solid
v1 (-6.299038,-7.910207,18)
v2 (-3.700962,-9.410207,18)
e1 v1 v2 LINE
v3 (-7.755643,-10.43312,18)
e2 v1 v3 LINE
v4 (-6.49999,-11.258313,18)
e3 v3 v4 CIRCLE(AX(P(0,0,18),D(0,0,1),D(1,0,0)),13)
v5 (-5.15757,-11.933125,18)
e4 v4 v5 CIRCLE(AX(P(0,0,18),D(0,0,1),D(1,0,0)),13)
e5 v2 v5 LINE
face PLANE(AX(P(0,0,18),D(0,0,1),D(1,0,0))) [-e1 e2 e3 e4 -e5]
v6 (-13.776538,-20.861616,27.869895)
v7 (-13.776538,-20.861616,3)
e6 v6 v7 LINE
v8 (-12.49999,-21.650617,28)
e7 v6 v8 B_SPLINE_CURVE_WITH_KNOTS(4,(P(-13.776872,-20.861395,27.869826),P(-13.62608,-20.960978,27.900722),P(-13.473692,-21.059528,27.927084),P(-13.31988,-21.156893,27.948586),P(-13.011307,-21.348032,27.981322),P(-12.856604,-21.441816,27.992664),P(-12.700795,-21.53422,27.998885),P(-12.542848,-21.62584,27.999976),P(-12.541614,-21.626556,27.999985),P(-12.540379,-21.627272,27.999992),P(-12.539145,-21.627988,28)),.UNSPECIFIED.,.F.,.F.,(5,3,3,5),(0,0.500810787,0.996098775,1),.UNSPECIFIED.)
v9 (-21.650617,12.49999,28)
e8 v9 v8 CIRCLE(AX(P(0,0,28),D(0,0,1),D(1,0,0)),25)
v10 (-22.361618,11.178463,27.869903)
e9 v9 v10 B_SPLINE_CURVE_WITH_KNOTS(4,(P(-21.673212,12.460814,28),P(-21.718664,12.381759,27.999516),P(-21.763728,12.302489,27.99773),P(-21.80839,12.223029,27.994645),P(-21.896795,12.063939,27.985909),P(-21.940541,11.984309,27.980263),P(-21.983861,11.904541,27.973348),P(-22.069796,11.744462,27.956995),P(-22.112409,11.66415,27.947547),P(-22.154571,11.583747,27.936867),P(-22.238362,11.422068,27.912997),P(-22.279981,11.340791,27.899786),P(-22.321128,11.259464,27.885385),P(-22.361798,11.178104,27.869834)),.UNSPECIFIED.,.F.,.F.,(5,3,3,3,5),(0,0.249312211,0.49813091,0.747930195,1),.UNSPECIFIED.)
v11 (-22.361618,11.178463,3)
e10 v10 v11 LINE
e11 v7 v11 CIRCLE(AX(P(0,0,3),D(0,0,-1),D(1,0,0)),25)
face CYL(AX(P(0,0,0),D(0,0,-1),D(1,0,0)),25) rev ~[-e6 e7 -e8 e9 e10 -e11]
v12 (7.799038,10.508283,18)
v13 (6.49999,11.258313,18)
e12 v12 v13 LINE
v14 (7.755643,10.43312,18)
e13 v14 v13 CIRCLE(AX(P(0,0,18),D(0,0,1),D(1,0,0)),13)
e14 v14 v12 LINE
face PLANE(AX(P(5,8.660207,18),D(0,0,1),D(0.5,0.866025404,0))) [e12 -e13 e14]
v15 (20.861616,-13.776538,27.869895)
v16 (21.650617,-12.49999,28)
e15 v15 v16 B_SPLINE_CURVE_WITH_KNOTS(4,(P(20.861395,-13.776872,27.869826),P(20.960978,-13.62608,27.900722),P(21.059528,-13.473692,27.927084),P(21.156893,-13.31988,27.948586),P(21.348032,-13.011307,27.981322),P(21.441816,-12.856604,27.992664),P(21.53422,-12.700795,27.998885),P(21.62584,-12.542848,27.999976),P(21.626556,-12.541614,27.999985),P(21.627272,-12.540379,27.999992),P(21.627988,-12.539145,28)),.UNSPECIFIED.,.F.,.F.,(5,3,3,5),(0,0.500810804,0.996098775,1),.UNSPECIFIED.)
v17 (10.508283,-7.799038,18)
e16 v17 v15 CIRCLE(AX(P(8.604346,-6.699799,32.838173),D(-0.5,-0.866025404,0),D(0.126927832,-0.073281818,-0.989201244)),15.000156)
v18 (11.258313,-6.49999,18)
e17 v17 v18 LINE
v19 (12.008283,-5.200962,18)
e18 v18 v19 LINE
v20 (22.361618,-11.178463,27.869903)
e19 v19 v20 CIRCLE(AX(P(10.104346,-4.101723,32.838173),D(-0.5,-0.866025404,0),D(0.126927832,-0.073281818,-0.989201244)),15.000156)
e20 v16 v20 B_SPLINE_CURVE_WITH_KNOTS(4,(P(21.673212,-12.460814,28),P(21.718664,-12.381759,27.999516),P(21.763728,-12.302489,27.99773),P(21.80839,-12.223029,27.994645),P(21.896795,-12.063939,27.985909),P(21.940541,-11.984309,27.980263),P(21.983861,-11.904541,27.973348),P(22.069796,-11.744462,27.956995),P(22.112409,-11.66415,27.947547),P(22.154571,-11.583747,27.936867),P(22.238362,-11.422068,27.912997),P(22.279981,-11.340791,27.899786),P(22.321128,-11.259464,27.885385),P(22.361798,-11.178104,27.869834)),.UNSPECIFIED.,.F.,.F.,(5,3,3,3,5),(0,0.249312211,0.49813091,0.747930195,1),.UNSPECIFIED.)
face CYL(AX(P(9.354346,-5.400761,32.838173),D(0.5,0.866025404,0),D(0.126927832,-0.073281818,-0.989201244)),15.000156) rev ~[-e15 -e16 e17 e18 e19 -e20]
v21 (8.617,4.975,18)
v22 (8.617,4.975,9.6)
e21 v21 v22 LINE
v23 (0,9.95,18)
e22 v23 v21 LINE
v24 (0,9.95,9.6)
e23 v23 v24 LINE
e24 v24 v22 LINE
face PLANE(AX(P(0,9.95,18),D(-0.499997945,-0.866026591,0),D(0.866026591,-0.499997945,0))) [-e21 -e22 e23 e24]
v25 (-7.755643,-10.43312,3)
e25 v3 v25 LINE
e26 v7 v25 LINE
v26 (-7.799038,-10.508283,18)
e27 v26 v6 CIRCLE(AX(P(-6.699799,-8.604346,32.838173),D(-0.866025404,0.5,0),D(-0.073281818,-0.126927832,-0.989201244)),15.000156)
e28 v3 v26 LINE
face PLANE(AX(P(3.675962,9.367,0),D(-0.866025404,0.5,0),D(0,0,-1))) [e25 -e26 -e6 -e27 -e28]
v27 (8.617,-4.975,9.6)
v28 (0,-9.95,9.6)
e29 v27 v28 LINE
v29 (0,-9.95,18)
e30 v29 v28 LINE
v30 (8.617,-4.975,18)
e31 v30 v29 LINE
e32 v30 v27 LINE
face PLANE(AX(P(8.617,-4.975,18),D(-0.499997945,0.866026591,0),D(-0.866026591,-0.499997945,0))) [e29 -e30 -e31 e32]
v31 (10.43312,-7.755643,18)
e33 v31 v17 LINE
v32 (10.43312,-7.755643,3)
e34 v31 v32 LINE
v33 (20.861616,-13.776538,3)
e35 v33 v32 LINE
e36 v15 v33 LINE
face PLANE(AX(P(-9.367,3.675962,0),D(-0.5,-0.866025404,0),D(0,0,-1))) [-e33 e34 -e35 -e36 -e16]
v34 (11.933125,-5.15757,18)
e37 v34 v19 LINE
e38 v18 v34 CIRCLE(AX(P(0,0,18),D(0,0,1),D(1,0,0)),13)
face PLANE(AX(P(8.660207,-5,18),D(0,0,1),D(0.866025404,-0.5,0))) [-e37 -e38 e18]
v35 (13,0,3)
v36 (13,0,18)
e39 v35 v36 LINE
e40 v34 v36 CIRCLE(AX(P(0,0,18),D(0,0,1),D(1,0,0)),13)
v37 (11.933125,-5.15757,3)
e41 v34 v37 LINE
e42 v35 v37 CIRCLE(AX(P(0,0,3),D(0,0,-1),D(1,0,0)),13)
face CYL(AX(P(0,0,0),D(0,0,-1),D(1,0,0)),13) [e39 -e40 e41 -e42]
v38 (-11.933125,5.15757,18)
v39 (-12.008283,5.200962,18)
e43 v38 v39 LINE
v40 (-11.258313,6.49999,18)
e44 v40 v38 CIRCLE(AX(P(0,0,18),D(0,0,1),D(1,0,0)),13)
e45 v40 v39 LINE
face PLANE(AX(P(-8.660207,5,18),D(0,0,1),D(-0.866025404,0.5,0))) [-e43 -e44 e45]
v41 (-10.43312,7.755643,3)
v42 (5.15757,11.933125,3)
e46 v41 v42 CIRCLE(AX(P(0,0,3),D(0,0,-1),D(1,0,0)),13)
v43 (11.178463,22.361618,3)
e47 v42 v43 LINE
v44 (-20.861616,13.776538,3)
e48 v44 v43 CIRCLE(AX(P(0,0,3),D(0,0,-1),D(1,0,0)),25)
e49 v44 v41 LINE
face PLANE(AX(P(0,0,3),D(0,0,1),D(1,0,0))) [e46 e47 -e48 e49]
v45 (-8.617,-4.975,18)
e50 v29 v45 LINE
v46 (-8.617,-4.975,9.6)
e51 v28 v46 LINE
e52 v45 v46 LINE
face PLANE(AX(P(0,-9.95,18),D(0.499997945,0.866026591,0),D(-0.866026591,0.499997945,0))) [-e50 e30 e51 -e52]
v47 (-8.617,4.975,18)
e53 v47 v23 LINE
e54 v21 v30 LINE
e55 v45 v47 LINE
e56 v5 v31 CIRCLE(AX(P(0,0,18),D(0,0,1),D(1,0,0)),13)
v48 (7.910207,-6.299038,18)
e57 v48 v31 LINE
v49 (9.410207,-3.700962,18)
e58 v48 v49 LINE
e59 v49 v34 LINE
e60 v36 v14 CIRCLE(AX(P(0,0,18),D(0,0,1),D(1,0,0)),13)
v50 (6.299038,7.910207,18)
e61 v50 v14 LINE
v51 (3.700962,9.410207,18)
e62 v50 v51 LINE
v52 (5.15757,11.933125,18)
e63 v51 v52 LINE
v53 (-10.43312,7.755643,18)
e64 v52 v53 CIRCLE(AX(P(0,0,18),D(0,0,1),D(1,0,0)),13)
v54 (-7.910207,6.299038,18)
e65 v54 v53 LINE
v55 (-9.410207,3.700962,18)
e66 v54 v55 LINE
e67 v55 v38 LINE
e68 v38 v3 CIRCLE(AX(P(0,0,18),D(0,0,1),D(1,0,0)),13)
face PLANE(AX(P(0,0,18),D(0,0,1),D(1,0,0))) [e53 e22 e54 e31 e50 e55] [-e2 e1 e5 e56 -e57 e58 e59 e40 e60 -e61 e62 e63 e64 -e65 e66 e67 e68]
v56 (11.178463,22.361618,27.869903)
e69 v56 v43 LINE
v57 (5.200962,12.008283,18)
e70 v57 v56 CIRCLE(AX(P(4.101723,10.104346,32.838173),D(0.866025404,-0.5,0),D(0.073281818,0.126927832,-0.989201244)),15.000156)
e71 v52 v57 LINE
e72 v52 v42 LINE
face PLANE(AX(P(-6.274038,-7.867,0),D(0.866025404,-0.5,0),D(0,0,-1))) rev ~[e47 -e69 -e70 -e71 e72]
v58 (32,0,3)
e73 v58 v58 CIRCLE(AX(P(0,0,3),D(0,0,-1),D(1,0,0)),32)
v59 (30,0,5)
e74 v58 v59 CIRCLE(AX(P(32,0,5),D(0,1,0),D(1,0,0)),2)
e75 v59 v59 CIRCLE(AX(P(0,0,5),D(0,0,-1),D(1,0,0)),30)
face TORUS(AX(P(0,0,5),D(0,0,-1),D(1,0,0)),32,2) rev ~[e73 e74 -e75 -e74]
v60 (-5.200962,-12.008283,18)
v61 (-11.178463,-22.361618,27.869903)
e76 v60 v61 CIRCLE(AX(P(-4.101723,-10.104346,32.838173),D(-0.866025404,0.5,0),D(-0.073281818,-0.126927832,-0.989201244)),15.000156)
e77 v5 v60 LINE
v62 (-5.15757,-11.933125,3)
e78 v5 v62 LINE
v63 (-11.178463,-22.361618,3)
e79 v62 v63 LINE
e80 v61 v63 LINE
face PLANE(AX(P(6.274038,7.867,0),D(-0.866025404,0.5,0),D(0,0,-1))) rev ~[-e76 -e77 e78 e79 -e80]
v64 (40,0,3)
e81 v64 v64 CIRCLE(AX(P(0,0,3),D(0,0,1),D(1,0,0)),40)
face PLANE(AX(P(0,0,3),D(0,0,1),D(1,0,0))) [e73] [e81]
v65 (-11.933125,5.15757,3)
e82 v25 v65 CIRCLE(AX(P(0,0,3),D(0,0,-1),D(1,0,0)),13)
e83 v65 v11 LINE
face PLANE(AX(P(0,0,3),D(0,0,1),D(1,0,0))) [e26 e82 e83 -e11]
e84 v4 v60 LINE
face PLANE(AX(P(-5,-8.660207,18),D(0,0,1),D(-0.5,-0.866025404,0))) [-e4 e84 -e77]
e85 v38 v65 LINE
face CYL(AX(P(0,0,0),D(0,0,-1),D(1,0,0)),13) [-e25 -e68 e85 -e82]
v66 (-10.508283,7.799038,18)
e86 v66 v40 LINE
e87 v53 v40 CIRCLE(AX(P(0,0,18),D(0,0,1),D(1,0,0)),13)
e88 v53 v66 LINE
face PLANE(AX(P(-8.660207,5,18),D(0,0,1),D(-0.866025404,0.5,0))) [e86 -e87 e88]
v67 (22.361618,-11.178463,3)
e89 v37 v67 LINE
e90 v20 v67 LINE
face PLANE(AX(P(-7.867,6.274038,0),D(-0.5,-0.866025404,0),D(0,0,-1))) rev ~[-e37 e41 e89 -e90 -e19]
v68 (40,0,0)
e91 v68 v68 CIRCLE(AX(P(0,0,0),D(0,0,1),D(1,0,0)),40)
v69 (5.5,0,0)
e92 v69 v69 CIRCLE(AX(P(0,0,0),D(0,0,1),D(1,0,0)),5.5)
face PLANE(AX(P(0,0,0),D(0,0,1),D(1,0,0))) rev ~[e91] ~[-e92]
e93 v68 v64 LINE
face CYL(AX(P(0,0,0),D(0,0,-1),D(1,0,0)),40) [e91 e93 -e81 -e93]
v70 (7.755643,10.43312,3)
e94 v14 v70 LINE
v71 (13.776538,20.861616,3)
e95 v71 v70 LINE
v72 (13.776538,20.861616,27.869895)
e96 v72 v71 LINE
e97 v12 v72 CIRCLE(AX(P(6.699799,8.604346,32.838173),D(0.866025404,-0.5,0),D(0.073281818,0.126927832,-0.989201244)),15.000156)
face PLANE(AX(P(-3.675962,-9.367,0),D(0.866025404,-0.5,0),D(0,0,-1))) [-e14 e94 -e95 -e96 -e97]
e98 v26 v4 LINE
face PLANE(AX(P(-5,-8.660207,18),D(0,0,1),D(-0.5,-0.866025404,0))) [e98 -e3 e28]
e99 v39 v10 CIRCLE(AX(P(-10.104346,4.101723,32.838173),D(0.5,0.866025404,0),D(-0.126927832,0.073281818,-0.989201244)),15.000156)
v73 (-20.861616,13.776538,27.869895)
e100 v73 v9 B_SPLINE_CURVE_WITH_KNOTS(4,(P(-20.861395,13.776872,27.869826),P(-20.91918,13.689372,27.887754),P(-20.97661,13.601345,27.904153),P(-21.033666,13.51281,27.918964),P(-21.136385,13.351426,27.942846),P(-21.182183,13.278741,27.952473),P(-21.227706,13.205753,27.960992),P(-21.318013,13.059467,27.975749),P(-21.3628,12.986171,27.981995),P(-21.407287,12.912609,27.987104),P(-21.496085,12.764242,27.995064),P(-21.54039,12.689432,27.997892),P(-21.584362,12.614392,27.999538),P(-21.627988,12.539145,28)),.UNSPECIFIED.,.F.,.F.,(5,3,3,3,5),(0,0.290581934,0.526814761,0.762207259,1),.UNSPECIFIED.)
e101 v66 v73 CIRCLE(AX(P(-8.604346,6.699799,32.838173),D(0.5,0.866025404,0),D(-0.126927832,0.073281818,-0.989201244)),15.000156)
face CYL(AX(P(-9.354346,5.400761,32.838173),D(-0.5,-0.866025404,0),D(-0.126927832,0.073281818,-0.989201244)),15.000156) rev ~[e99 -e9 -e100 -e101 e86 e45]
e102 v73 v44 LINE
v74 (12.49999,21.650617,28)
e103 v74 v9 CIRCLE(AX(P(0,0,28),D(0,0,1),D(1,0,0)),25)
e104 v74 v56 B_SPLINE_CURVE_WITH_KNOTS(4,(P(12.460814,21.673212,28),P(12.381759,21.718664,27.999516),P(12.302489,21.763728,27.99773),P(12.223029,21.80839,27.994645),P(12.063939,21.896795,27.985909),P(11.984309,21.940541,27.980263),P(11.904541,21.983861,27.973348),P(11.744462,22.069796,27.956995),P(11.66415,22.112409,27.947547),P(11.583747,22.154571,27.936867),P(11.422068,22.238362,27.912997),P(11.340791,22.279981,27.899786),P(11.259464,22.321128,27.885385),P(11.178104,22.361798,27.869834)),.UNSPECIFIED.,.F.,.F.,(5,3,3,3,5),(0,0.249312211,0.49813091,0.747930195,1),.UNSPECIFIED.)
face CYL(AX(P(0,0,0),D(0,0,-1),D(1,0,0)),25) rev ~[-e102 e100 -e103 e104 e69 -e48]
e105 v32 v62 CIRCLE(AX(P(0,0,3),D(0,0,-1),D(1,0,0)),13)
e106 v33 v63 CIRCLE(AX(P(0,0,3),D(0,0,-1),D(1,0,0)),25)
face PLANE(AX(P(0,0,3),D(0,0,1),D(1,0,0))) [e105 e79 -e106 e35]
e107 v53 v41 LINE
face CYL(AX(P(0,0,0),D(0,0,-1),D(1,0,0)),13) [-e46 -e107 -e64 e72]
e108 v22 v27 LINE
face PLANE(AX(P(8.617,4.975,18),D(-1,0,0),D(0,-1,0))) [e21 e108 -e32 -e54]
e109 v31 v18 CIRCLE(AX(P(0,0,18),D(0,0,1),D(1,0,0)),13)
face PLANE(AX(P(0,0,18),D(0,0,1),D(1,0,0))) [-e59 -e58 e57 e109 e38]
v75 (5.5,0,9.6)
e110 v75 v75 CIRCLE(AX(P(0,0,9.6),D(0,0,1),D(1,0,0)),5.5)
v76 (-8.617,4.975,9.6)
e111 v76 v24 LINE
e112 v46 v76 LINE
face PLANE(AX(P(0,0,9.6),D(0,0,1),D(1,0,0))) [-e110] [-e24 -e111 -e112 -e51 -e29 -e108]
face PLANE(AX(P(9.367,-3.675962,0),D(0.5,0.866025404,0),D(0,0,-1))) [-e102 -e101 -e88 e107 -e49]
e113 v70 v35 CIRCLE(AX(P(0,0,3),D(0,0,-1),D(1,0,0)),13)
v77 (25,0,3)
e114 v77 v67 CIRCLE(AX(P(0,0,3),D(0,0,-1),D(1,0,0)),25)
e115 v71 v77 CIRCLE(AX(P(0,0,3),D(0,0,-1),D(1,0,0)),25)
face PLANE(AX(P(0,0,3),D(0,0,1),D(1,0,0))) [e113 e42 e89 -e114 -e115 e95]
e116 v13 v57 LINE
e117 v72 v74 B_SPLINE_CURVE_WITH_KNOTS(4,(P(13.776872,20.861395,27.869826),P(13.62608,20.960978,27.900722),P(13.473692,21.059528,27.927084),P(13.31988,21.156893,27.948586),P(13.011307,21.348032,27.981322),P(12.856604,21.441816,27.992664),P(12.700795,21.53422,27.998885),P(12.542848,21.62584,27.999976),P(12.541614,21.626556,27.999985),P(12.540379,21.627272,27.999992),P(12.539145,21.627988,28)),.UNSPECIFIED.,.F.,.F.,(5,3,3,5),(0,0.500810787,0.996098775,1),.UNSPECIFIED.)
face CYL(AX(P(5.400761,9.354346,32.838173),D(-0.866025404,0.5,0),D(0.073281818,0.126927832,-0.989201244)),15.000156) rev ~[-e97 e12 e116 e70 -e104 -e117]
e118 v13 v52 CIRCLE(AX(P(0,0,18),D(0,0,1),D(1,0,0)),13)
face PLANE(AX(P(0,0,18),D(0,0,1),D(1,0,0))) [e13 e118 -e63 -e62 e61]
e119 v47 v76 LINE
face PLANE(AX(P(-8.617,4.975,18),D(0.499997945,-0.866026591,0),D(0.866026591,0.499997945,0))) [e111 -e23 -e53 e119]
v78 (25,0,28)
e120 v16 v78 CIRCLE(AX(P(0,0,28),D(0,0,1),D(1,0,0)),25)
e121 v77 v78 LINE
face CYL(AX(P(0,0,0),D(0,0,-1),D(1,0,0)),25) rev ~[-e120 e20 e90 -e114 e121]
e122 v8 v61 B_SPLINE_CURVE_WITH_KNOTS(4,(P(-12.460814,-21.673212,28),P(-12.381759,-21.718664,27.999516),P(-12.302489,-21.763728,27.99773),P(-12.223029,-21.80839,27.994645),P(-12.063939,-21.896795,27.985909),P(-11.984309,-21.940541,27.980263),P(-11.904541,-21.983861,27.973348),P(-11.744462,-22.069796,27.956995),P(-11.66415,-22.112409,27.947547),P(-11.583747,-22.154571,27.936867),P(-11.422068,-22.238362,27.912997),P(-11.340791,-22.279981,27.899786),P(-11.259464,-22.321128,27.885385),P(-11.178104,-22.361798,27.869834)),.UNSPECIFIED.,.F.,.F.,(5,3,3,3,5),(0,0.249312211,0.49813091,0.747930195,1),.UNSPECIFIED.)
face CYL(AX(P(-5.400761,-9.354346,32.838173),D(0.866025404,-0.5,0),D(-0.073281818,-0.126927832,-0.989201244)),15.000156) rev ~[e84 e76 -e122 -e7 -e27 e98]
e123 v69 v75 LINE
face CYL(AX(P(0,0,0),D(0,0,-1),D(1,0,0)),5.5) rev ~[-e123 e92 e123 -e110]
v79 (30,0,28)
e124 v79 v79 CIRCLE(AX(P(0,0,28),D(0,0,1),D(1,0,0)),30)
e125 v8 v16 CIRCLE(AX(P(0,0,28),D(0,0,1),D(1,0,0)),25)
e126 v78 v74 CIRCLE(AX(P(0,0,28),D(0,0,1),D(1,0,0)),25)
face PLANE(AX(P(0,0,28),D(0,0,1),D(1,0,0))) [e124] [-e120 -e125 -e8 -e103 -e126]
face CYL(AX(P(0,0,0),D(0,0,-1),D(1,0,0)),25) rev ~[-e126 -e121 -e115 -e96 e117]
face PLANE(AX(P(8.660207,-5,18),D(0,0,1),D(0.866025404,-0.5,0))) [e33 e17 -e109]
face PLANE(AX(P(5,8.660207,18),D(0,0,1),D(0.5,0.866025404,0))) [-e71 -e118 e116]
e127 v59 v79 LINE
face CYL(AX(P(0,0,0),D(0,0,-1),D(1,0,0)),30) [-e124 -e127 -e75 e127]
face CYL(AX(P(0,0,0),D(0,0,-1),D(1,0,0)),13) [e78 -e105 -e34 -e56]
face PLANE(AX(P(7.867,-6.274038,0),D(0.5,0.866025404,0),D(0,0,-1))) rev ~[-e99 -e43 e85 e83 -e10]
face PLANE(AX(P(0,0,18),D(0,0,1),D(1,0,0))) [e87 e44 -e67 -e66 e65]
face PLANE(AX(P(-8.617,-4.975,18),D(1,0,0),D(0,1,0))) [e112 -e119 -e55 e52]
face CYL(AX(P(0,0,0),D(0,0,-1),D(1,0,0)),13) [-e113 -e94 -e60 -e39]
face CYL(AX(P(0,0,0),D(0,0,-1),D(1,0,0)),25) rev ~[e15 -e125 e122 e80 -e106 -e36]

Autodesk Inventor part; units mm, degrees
ref_plane "YZ Plane" through (0, 0, 0) normal (1, 0, 0) x (0, 1, 0)
ref_plane "XZ Plane" through (0, 0, 0) normal (0, 1, 0) x (-1, 0, 0)
sketch "Sketch1" plane through (0, 0, 0) normal (0, 0, 1) x (1, 0, 0)
  circle A0 centre (0, 0) radius 30
  circle A1 centre (0, 0) radius 40
  circle A2 centre (0, 0) radius 25
  circle A3 centre (0, 0) radius 13
  circle A4 centre (0, 0) radius 5.5
  circle A5 centre (0, 0) radius 9.95 construction
  line L0 (0, 9.95) -> (8.617, 4.975)
  line L1 (8.617, 4.975) -> (8.617, -4.975)
  line L2 (8.617, -4.975) -> (0, -9.95)
  line L3 (0, -9.95) -> (-8.617, -4.975)
  line L4 (-8.617, -4.975) -> (-8.617, 4.975)
  line L5 (-8.617, 4.975) -> (0, 9.95)
  line L6 (0, 9.95) -> (0, -9.95) construction
  dimension "bolt_head_hub_WAC" = 19.9
  dimension "wheel_diam" = 60
  dimension "d1" = 80
  dimension "d4" = 50
  dimension "d5" = 26
  dimension "hub_id" = 11
extrude "Extrusion1" add sketch "Sketch1" along normal blind 3 contours A0 | A1 | A2 | A3 | A4 | L0 L1 L2 L3 L4 L5
extrude "Extrusion2" add sketch "Sketch1" along normal blind 28 contours A0
extrude "Extrusion3" add sketch "Sketch1" along normal blind 18 contours A3 | L0 L1 L2 L3 L4 L5
extrude "Extrusion4" cut sketch "Sketch1" against normal blind 8.4 from surface at 18 contours L0 L1 L2 L3 L4 L5
extrude "Extrusion5" cut sketch "Sketch1" along normal up to surface (3 mm away) contours A4
fillet "Fillet1" radius 2 1 edges at (-30, 0, 3)
ref_plane "Work Plane1" through (-8.617, 4.975, 0) normal (-0.5, -0.8660254, 0) x (0, 0, -1)
sketch "Sketch3" plane through (-8.617, 4.975, 0) normal (-0.5, -0.8660254, 0) x (0, 0, -1)
  line L0 (-3, 22.95) -> (-18, 22.95) projected
  line L1 (-3, 34.95) -> (-3, -15.05) projected
  line L2 (-3, -3.05) -> (-3, 22.95) projected
  line L3 (-28, 34.95) -> (-3, 34.95) projected
  line L4 (-18, 22.95) -> (-3, 22.95)
  line L5 (-3, 22.95) -> (-3, 19.95)
  line L6 (-3, 19.95) -> (-18, 19.95)
  line L7 (-18, 19.95) -> (-18, 22.95)
  arc A0 (-18, 22.95) -> (-28, 34.95) centre (-32.838, 20.7516) ccw
  point P0 (0, 9.95)
  dimension "d18" = 3
  dimension "d21" = 15
extrude "Extrusion6" add sketch "Sketch3" along normal mid plane 3
pattern_circular "Circular Pattern1" count 4 over 360 about axis through (0, 0, -10) along (0, 0, 1) of "Extrusion6"
equation "\"bolt_head_hub_WAC\" = bolt_WAC + 2 * printer_tolerance"
equation "\"d1\" = wheel_diam + 2 * flange_extra"
equation "\"d4\" = wheel_diam - 2 * wheel_thick"
equation "\"d5\" = bolt_head_hub_WAC + 2 * bolt_head_hub_clearance"
equation "\"hub_id\" = bolt_od + 2 * printer_tolerance"
equation "\"d8\" = track_w + flange_w"
equation "\"d10\" = flange_w + hub_height"
equation "\"track_w\" = 25"
equation "\"wheel_thick\" = 5"
equation "\"bolt_head_hub_clearance\" = 3.05"
equation "\"hub_height\" = 15"
equation "\"bolt_head_thick\" = 6.4"
equation "\"bolt_WAC\" = 18.9"
equation "\"printer_tolerance\" = 0.5"
equation "\"flange_extra\" = 10"
equation "\"bolt_od\" = 10"
equation "\"flange_w\" = 3"
properties part number "test_wheel_v1"
